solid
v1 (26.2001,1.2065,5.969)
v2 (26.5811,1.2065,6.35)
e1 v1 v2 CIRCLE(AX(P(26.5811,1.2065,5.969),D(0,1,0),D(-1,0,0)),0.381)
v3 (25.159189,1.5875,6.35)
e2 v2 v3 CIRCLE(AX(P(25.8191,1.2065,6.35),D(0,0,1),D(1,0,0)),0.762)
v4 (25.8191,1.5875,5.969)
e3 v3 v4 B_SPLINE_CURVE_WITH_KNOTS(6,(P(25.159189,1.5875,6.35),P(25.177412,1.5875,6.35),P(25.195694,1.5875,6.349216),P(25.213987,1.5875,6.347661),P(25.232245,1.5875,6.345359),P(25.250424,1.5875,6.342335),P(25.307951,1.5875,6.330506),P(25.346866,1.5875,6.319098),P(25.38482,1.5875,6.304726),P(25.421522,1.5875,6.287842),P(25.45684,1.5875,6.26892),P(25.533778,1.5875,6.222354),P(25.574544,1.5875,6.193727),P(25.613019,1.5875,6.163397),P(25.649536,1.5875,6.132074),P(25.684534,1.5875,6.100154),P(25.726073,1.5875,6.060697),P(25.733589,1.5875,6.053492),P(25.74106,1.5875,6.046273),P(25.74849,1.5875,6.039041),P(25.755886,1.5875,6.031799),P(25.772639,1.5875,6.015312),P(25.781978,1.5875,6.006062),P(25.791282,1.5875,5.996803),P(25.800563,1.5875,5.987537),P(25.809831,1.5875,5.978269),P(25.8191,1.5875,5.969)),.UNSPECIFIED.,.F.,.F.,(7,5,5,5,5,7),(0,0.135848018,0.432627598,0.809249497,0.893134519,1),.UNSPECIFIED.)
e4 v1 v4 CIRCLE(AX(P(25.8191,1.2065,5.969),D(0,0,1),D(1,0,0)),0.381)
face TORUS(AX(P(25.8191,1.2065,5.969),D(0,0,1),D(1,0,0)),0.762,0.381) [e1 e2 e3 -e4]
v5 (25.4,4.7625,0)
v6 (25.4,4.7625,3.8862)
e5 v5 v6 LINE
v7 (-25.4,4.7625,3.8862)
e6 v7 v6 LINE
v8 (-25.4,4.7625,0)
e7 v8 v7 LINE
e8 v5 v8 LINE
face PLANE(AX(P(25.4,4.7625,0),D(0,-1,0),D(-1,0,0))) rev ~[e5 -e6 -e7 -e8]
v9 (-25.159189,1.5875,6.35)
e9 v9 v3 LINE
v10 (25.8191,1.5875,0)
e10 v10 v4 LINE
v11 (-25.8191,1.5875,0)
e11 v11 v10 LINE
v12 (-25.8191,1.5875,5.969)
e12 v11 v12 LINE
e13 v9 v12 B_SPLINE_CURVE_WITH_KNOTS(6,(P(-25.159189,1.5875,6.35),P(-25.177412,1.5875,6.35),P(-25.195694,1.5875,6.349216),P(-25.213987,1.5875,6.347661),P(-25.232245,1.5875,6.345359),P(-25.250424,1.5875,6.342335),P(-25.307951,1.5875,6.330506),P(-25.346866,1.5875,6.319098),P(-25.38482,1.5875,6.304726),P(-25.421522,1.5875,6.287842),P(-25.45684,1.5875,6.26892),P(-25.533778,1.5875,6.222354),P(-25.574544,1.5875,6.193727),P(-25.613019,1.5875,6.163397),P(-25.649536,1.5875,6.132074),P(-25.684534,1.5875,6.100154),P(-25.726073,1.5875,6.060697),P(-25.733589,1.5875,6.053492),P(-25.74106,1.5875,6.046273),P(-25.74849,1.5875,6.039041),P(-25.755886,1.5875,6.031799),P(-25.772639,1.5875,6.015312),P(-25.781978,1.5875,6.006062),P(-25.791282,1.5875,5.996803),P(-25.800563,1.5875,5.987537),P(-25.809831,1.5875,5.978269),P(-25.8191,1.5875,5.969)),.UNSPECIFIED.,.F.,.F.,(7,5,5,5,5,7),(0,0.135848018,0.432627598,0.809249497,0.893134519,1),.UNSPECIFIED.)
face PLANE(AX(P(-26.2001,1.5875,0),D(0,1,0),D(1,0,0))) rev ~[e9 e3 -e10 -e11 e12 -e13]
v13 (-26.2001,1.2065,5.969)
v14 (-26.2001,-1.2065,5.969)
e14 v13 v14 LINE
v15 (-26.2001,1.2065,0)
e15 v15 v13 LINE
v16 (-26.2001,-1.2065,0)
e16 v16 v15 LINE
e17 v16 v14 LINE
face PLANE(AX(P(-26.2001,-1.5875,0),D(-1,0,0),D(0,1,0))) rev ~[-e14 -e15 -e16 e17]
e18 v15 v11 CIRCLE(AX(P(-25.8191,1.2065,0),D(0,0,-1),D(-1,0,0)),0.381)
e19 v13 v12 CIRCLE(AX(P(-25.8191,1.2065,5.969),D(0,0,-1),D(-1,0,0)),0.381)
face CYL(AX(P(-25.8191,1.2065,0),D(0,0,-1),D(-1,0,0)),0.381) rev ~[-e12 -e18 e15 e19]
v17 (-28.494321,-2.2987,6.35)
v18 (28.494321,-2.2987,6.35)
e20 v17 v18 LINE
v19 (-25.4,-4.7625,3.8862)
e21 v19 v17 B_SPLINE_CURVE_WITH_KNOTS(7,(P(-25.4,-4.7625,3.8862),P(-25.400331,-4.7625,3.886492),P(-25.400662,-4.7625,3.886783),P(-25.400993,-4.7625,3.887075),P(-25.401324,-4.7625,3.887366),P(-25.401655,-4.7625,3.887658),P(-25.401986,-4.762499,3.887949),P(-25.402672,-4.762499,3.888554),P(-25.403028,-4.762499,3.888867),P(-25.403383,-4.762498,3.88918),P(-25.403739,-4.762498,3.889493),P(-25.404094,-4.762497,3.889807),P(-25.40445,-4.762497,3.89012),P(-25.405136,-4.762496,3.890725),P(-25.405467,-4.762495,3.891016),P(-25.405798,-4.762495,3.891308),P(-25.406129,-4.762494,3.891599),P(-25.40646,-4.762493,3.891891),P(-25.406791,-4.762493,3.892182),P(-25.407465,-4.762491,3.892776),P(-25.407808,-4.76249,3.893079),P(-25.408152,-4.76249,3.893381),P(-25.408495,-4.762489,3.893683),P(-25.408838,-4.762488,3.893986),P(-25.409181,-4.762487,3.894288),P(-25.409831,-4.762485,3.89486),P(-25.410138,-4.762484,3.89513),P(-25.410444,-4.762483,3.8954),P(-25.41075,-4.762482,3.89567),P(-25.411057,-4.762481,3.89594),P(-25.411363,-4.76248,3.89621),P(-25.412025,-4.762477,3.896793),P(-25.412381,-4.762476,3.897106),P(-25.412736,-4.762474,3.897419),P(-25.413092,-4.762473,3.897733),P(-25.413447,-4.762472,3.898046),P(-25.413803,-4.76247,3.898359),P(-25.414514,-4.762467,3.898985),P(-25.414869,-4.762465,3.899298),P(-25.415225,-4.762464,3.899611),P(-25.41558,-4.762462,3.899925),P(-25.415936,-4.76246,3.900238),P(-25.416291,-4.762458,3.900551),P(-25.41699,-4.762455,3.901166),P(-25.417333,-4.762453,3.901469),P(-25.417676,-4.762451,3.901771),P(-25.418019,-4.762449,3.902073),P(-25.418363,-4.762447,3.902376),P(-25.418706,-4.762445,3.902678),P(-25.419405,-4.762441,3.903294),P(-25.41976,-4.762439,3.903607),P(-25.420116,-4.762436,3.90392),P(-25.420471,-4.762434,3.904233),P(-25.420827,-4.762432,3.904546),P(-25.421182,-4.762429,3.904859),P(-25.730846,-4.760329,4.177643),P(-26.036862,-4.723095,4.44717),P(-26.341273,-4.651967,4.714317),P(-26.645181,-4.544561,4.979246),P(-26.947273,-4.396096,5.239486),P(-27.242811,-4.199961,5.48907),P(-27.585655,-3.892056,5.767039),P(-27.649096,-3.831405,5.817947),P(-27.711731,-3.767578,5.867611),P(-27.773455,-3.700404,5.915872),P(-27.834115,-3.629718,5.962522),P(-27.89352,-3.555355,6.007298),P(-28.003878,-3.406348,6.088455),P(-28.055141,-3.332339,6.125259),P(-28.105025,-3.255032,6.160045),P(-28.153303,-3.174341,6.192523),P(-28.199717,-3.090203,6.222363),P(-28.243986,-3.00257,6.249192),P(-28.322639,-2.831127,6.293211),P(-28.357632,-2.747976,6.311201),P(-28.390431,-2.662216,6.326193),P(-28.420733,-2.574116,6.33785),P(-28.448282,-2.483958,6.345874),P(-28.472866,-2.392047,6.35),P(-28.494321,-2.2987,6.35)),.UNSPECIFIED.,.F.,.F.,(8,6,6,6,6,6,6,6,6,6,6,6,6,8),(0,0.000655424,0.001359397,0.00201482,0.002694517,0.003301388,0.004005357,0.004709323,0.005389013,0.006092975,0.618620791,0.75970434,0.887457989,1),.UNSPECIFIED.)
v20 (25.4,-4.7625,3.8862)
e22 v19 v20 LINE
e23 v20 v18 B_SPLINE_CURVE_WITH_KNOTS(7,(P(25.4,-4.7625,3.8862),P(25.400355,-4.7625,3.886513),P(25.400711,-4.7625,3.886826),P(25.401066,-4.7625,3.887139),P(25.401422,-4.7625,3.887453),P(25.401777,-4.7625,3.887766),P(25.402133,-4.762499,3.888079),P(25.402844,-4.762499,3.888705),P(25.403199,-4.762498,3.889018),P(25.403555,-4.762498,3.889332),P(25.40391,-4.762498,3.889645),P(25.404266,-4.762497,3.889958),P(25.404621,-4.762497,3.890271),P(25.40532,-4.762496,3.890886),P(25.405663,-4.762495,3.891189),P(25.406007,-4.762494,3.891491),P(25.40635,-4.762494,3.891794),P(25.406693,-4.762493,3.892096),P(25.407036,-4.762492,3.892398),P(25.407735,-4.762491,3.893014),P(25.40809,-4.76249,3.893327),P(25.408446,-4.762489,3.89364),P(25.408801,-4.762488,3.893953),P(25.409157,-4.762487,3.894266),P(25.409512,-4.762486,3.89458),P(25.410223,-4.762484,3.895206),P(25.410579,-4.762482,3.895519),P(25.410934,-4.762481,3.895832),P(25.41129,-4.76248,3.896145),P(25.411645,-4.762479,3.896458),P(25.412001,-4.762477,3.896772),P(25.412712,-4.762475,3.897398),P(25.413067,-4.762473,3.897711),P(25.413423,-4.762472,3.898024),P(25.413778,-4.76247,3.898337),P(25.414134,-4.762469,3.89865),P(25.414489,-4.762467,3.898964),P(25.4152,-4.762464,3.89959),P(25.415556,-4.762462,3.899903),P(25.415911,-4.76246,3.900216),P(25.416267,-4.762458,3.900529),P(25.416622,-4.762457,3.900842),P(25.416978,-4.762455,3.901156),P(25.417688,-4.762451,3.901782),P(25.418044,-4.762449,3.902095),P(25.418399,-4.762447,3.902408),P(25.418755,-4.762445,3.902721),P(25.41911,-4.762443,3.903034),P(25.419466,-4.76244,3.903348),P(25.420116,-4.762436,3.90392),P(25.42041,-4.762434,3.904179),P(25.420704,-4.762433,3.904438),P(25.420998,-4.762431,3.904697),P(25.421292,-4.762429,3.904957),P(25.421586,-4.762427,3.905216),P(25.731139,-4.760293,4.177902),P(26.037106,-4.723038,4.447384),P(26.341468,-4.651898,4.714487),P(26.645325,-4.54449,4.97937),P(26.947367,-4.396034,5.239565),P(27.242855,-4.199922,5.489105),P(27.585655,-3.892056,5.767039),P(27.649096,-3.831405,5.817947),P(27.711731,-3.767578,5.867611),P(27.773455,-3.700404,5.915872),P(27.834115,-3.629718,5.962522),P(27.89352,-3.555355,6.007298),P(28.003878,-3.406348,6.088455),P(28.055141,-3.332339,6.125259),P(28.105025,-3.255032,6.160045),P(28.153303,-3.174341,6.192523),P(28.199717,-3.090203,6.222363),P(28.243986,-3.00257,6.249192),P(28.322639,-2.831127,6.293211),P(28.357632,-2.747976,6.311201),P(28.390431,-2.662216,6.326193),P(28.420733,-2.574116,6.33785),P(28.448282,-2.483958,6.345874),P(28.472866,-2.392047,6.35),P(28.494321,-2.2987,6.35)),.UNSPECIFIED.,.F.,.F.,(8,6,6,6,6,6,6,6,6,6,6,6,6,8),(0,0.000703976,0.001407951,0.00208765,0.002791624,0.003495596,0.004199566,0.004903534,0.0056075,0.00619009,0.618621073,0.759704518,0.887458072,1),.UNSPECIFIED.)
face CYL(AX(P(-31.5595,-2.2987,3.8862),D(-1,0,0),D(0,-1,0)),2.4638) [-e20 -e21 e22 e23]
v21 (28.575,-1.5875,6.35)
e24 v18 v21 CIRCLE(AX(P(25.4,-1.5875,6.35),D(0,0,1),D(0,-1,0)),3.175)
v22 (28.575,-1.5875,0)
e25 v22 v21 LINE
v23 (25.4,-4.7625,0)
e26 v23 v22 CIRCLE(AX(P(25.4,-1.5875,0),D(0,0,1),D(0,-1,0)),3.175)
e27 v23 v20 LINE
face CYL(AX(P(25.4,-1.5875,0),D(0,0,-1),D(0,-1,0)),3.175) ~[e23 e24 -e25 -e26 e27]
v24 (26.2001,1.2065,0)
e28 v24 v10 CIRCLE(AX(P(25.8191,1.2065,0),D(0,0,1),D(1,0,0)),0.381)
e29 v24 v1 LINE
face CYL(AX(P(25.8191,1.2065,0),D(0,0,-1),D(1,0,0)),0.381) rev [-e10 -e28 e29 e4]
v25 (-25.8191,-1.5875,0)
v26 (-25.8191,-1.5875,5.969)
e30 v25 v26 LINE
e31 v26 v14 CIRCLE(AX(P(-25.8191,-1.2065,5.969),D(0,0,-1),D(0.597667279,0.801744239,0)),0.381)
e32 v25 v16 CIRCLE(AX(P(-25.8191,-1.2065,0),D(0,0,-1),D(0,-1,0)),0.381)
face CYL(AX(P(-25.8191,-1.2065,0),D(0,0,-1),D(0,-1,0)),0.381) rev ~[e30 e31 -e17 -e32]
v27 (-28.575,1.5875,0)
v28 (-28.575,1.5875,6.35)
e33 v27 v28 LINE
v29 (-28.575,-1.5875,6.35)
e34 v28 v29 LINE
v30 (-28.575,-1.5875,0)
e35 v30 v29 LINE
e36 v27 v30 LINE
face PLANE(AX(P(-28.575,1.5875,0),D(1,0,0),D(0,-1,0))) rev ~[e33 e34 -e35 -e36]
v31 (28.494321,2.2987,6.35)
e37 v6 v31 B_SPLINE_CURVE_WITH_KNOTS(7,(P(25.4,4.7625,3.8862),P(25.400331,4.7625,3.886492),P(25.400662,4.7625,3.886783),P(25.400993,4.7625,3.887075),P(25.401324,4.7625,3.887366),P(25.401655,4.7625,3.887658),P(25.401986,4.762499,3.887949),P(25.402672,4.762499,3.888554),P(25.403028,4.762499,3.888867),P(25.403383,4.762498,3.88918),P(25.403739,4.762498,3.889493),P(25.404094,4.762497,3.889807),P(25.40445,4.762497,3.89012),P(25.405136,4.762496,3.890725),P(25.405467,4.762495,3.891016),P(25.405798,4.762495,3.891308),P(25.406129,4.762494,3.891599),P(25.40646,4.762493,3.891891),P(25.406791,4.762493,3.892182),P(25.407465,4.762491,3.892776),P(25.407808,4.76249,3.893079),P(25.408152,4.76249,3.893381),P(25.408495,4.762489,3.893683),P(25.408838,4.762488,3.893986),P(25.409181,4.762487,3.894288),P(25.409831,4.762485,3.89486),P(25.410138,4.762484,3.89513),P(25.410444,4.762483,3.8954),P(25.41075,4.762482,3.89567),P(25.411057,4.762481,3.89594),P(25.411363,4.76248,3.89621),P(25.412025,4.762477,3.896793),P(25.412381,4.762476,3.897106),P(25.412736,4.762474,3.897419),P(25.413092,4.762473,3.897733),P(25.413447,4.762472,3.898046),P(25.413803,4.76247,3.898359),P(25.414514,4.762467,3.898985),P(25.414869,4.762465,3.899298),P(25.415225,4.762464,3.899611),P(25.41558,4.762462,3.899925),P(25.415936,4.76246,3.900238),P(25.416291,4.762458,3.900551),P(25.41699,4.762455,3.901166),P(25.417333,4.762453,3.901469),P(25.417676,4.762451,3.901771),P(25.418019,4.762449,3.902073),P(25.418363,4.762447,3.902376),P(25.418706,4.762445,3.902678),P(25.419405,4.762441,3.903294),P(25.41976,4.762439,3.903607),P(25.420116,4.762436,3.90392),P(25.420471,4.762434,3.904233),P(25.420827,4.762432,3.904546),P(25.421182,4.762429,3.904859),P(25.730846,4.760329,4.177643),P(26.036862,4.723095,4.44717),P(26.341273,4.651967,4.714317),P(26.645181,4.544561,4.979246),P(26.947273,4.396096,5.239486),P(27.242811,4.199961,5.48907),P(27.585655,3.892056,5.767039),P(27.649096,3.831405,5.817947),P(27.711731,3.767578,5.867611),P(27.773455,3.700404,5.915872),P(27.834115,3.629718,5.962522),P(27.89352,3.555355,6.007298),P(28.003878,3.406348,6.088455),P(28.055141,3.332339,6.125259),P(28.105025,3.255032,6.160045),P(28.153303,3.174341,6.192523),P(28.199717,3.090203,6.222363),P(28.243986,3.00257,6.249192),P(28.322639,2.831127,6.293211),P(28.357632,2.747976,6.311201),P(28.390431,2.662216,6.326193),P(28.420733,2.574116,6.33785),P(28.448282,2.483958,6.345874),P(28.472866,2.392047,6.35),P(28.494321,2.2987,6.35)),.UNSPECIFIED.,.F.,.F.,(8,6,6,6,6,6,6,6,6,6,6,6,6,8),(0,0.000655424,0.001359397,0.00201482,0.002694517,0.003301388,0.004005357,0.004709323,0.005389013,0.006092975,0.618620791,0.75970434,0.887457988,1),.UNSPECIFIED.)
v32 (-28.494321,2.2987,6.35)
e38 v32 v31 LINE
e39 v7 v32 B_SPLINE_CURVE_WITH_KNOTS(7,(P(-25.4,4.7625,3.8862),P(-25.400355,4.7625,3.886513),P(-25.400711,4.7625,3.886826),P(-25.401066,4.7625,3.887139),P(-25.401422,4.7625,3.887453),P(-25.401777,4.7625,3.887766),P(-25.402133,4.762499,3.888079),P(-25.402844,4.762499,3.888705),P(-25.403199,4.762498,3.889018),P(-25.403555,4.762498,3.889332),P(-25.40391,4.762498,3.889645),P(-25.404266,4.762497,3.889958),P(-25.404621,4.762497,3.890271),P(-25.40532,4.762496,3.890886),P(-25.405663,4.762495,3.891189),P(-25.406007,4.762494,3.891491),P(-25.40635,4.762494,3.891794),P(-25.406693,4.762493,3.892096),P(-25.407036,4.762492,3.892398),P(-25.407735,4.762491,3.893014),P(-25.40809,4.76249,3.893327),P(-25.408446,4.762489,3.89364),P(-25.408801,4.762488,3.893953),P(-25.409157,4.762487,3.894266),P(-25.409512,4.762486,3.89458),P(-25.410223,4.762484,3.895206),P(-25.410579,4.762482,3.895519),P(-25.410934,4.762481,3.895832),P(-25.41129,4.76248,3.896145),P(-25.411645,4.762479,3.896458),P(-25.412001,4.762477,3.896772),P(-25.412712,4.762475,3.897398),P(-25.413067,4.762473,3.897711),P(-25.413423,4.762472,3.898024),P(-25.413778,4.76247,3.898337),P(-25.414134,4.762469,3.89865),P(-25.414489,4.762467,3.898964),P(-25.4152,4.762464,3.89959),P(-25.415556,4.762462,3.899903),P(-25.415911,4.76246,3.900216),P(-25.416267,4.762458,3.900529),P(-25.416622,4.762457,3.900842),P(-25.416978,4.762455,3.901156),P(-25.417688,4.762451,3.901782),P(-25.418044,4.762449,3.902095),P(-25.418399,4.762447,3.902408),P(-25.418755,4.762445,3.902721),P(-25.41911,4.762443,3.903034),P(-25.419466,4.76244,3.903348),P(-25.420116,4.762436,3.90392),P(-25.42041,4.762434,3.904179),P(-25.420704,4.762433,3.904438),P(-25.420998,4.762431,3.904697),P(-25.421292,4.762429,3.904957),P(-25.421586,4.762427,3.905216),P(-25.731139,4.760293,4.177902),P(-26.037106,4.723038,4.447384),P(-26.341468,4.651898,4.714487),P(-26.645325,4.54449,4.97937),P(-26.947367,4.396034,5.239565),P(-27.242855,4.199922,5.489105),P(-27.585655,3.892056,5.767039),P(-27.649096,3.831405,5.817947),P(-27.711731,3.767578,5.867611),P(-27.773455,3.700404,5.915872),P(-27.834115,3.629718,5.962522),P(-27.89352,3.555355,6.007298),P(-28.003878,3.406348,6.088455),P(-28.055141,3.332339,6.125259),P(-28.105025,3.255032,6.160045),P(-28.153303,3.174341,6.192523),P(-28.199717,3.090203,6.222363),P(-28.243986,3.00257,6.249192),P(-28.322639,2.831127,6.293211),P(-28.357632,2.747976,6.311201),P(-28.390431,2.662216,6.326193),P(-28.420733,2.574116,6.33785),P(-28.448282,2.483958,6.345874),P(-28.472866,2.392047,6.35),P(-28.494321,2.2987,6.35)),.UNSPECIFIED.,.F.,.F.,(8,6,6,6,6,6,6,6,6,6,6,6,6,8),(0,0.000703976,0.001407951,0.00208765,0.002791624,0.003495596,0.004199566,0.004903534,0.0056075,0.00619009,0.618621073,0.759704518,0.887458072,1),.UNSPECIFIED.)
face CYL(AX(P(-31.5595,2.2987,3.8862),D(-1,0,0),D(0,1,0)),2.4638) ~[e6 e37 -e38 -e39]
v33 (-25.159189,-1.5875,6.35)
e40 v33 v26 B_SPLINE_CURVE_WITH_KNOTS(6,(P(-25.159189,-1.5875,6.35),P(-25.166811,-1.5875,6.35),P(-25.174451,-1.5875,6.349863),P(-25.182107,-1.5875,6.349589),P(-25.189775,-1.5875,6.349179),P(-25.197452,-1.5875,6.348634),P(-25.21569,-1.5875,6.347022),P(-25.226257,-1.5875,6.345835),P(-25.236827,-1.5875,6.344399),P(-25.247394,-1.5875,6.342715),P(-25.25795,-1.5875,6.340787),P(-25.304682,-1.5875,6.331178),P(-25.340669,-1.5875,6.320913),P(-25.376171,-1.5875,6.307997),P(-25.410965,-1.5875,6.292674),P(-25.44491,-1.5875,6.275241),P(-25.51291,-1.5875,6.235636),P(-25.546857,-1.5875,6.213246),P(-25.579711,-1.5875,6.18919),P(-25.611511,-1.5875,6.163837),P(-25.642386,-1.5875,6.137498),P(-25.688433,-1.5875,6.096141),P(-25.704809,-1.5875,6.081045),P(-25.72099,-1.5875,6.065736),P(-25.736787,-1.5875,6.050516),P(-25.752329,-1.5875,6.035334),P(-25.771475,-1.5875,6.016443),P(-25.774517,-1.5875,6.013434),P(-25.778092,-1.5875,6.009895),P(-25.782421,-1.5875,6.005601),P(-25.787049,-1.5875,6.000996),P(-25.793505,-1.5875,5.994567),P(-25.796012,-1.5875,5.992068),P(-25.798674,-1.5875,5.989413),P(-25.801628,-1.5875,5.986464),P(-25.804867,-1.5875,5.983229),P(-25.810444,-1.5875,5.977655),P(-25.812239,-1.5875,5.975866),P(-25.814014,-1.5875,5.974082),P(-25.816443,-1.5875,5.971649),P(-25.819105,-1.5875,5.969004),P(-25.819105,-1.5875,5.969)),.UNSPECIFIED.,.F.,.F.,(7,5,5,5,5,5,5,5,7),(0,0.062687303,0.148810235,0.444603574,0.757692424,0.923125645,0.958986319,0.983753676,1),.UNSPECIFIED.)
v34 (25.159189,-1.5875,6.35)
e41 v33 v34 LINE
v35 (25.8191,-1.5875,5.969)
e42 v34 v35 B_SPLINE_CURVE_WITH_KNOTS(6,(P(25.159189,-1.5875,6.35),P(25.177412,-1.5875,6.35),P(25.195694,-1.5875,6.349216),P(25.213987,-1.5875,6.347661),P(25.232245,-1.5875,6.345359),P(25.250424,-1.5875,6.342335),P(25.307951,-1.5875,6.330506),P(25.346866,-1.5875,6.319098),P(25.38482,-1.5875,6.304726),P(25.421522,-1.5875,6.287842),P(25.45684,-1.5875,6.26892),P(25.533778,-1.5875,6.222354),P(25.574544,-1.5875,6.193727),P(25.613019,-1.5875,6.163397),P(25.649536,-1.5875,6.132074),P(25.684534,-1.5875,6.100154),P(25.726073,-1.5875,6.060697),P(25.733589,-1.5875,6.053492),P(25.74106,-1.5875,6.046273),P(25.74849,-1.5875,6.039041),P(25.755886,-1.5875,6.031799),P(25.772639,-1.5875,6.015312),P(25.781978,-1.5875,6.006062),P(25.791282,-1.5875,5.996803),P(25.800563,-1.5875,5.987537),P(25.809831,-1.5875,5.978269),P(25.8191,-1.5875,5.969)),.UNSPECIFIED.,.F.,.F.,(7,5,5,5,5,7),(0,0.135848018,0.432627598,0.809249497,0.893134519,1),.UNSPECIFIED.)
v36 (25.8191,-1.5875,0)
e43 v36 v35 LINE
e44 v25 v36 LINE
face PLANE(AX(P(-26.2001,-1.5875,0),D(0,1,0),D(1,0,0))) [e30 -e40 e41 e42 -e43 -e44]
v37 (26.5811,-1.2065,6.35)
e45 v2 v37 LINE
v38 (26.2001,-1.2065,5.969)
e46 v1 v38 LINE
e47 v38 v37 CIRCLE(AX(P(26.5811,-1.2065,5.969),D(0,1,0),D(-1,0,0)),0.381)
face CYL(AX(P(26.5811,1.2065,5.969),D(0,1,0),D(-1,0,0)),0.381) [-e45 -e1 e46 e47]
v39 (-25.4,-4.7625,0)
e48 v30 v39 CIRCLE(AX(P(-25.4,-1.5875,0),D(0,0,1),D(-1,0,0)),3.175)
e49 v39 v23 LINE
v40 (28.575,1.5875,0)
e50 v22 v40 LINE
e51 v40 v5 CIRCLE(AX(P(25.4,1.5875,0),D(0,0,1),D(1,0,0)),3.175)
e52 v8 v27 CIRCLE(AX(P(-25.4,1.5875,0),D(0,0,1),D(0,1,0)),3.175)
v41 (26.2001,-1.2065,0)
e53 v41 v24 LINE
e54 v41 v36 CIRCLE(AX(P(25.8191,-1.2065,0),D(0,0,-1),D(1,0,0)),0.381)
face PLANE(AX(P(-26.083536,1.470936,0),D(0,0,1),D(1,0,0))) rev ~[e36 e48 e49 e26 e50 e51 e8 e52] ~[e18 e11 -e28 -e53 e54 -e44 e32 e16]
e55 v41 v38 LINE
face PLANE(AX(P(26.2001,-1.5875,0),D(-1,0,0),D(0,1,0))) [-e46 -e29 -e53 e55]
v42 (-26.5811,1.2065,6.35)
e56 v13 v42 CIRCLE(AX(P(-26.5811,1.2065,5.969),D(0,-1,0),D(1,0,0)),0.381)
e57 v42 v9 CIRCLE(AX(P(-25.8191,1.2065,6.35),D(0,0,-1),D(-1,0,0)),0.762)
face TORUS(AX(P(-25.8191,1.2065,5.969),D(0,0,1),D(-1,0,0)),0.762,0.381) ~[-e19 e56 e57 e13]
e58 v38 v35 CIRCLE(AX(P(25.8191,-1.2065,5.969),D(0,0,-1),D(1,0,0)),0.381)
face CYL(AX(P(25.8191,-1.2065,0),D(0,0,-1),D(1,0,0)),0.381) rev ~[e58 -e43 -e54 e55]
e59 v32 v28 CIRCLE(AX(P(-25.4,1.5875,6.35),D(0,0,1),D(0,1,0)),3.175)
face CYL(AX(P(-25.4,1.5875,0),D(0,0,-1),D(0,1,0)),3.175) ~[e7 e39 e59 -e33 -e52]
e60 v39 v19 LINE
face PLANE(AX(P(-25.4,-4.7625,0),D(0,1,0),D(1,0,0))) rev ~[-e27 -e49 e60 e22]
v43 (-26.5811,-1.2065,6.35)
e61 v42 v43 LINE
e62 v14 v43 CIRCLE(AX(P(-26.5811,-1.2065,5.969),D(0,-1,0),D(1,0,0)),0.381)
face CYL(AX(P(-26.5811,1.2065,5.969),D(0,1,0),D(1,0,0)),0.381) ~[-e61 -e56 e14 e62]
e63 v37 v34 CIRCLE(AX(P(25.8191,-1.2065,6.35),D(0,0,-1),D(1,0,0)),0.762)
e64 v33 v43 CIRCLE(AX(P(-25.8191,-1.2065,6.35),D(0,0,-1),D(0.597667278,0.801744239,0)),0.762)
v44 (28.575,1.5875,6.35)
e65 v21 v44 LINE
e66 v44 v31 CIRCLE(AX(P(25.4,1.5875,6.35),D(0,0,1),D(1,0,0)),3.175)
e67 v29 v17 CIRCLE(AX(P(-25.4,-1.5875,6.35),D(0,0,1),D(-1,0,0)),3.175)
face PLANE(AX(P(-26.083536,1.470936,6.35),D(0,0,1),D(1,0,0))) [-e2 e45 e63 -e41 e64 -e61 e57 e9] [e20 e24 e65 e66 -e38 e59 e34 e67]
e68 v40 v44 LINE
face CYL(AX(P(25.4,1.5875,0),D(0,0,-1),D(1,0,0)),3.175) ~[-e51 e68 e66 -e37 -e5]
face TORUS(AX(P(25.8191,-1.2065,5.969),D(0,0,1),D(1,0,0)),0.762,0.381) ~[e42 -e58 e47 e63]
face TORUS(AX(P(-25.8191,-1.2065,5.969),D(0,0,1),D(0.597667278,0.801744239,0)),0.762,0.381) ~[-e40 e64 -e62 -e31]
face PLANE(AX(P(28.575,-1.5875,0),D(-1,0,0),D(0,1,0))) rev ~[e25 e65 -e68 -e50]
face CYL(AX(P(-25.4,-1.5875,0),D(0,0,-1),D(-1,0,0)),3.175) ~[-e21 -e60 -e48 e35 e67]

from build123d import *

# Parameters (mm, degrees)
F0_W         = 52.4002
F0_H         = 3.175
F1_DEPTH     = 6.35
F2_T1_DEPTH  = 63.119
F3_T1_DEPTH  = 6.35
F3_T3_DEPTH  = 2.413
F3_T6_ANGLE  = 233.2969892374
F3_T8_ANGLE  = 233.2969892374
F3_T10_ANGLE = 233.2969892374
F3_T12_ANGLE = 233.2969892374


# Not quite as in the source:
# - a fillet or chamfer that OpenCascade refuses, or shapes differently, is made with other operations: its cross-section is extruded or revolved along the edge and cut away or added


with BuildPart() as f1:
    # F0 (on Top) → F1 (new body)
    with BuildSketch(Plane.XY):
        with BuildLine():
            Line((25.4, 4.7625), (-25.4, 4.7625))
            ThreePointArc((-25.4, 4.7625), (-27.6450640303, 3.8325640303), (-28.575, 1.5875))
            Line((-28.575, 1.5875), (-28.575, -1.5875))
            ThreePointArc((-28.575, -1.5875), (-27.6450640303, -3.8325640303), (-25.4, -4.7625))
            Line((-25.4, -4.7625), (25.4, -4.7625))
            ThreePointArc((25.4, -4.7625), (27.6450640303, -3.8325640303), (28.575, -1.5875))
            Line((28.575, -1.5875), (28.575, 1.5875))
            ThreePointArc((28.575, 1.5875), (27.6450640303, 3.8325640303), (25.4, 4.7625))
        make_face()
        Rectangle(F0_W, F0_H, mode=Mode.SUBTRACT)
    extrude(amount=F1_DEPTH)

    # F2: fillet of radius 2.4638 on 2 edges, made by hand

    # F2_s2 → F2_t1 (cut)
    with BuildSketch(Plane.YZ.offset(-31.5595)):
        with BuildLine():
            ThreePointArc((-4.7625, 3.8862), (-4.0408696875, 5.6283696875), (-2.2987, 6.35))
            Line((-2.2987, 6.35), (-4.7625, 6.35))
            Line((-4.7625, 6.35), (-4.7625, 3.8862))
        make_face()
        with BuildLine():
            ThreePointArc((4.7625, 3.8862), (4.0408696875, 5.6283696875), (2.2987, 6.35))
            Line((2.2987, 6.35), (4.7625, 6.35))
            Line((4.7625, 6.35), (4.7625, 3.8862))
        make_face()
    extrude(amount=F2_T1_DEPTH, mode=Mode.SUBTRACT)

    # F3: fillet of radius 0.381 on 6 edges, made by hand

    # F3_s2 → F3_t1 (join)
    with BuildSketch(Plane.XY):
        with BuildLine():
            ThreePointArc((-26.2001, 1.2065), (-26.0885076836, 1.4759076836), (-25.8191, 1.5875))
            Line((-25.8191, 1.5875), (-26.2001, 1.5875))
            Line((-26.2001, 1.5875), (-26.2001, 1.2065))
        make_face()
        with BuildLine():
            ThreePointArc((26.2001, 1.2065), (26.0885076836, 1.4759076836), (25.8191, 1.5875))
            Line((25.8191, 1.5875), (26.2001, 1.5875))
            Line((26.2001, 1.5875), (26.2001, 1.2065))
        make_face()
        with BuildLine():
            ThreePointArc((26.2001, -1.2065), (26.0885076836, -1.4759076836), (25.8191, -1.5875))
            Line((25.8191, -1.5875), (26.2001, -1.5875))
            Line((26.2001, -1.5875), (26.2001, -1.2065))
        make_face()
        with BuildLine():
            ThreePointArc((-25.8191, -1.5875), (-26.0885076836, -1.4759076836), (-26.2001, -1.2065))
            Line((-26.2001, -1.2065), (-26.2001, -1.5875))
            Line((-26.2001, -1.5875), (-25.8191, -1.5875))
        make_face()
    extrude(amount=F3_T1_DEPTH)

    # F3_s4 → F3_t3 (cut)
    with BuildSketch(Plane.XZ.offset(-1.2065)):
        with BuildLine():
            ThreePointArc((-26.2001, 5.969), (-26.3116923164, 6.2384076836), (-26.5811, 6.35))
            Line((-26.5811, 6.35), (-26.2001, 6.35))
            Line((-26.2001, 6.35), (-26.2001, 5.969))
        make_face()
        with BuildLine():
            ThreePointArc((26.2001, 5.969), (26.3116923164, 6.2384076836), (26.5811, 6.35))
            Line((26.5811, 6.35), (26.2001, 6.35))
            Line((26.2001, 6.35), (26.2001, 5.969))
        make_face()
    extrude(amount=F3_T3_DEPTH, mode=Mode.SUBTRACT)

    # F3_s5 → F3_t6 (revolve, cut)
    with BuildSketch(Plane.XZ.offset(-1.2065)):
        with BuildLine():
            ThreePointArc((26.5811, 6.35), (26.3116923164, 6.2384076836), (26.2001, 5.969))
            Line((26.2001, 5.969), (26.2001, 6.35))
            Line((26.2001, 6.35), (26.5811, 6.35))
        make_face()
    revolve(axis=Axis((25.8191, 1.2065, 6.35), (0, 0, 1)), revolution_arc=F3_T6_ANGLE, mode=Mode.SUBTRACT)

    # F3_s7 → F3_t8 (revolve, cut)
    with BuildSketch(Plane.XZ.offset(1.2065)):
        with BuildLine():
            ThreePointArc((26.5811, 6.35), (26.3116923164, 6.2384076836), (26.2001, 5.969))
            Line((26.2001, 5.969), (26.2001, 6.35))
            Line((26.2001, 6.35), (26.5811, 6.35))
        make_face()
    revolve(axis=Axis((25.8191, -1.2065, 6.35), (0, 0, -1)), revolution_arc=F3_T8_ANGLE, mode=Mode.SUBTRACT)

    # F3_s9 → F3_t10 (revolve, cut)
    with BuildSketch(Plane(origin=(-16.0182318513, 11.9409314764, 0), x_dir=(0, 0, 1), z_dir=(-0.8017442393, 0.5976672776, 0))):
        with BuildLine():
            ThreePointArc((6.35, -15.6365356326), (6.2384076836, -15.9059433163), (5.969, -16.0175356326))
            Line((5.969, -16.0175356326), (6.35, -16.0175356326))
            Line((6.35, -16.0175356326), (6.35, -15.6365356326))
        make_face()
    revolve(axis=Axis((-25.8191, -1.2065, 6.35), (0, 0, -1)), revolution_arc=F3_T10_ANGLE, mode=Mode.SUBTRACT)

    # F3_s11 → F3_t12 (revolve, cut)
    with BuildSketch(Plane.XZ.offset(-1.2065)):
        with BuildLine():
            ThreePointArc((-26.5811, 6.35), (-26.3116923164, 6.2384076836), (-26.2001, 5.969))
            Line((-26.2001, 5.969), (-26.2001, 6.35))
            Line((-26.2001, 6.35), (-26.5811, 6.35))
        make_face()
    revolve(axis=Axis((-25.8191, 1.2065, 6.35), (0, 0, -1)), revolution_arc=F3_T12_ANGLE, mode=Mode.SUBTRACT)


solid = f1.part
